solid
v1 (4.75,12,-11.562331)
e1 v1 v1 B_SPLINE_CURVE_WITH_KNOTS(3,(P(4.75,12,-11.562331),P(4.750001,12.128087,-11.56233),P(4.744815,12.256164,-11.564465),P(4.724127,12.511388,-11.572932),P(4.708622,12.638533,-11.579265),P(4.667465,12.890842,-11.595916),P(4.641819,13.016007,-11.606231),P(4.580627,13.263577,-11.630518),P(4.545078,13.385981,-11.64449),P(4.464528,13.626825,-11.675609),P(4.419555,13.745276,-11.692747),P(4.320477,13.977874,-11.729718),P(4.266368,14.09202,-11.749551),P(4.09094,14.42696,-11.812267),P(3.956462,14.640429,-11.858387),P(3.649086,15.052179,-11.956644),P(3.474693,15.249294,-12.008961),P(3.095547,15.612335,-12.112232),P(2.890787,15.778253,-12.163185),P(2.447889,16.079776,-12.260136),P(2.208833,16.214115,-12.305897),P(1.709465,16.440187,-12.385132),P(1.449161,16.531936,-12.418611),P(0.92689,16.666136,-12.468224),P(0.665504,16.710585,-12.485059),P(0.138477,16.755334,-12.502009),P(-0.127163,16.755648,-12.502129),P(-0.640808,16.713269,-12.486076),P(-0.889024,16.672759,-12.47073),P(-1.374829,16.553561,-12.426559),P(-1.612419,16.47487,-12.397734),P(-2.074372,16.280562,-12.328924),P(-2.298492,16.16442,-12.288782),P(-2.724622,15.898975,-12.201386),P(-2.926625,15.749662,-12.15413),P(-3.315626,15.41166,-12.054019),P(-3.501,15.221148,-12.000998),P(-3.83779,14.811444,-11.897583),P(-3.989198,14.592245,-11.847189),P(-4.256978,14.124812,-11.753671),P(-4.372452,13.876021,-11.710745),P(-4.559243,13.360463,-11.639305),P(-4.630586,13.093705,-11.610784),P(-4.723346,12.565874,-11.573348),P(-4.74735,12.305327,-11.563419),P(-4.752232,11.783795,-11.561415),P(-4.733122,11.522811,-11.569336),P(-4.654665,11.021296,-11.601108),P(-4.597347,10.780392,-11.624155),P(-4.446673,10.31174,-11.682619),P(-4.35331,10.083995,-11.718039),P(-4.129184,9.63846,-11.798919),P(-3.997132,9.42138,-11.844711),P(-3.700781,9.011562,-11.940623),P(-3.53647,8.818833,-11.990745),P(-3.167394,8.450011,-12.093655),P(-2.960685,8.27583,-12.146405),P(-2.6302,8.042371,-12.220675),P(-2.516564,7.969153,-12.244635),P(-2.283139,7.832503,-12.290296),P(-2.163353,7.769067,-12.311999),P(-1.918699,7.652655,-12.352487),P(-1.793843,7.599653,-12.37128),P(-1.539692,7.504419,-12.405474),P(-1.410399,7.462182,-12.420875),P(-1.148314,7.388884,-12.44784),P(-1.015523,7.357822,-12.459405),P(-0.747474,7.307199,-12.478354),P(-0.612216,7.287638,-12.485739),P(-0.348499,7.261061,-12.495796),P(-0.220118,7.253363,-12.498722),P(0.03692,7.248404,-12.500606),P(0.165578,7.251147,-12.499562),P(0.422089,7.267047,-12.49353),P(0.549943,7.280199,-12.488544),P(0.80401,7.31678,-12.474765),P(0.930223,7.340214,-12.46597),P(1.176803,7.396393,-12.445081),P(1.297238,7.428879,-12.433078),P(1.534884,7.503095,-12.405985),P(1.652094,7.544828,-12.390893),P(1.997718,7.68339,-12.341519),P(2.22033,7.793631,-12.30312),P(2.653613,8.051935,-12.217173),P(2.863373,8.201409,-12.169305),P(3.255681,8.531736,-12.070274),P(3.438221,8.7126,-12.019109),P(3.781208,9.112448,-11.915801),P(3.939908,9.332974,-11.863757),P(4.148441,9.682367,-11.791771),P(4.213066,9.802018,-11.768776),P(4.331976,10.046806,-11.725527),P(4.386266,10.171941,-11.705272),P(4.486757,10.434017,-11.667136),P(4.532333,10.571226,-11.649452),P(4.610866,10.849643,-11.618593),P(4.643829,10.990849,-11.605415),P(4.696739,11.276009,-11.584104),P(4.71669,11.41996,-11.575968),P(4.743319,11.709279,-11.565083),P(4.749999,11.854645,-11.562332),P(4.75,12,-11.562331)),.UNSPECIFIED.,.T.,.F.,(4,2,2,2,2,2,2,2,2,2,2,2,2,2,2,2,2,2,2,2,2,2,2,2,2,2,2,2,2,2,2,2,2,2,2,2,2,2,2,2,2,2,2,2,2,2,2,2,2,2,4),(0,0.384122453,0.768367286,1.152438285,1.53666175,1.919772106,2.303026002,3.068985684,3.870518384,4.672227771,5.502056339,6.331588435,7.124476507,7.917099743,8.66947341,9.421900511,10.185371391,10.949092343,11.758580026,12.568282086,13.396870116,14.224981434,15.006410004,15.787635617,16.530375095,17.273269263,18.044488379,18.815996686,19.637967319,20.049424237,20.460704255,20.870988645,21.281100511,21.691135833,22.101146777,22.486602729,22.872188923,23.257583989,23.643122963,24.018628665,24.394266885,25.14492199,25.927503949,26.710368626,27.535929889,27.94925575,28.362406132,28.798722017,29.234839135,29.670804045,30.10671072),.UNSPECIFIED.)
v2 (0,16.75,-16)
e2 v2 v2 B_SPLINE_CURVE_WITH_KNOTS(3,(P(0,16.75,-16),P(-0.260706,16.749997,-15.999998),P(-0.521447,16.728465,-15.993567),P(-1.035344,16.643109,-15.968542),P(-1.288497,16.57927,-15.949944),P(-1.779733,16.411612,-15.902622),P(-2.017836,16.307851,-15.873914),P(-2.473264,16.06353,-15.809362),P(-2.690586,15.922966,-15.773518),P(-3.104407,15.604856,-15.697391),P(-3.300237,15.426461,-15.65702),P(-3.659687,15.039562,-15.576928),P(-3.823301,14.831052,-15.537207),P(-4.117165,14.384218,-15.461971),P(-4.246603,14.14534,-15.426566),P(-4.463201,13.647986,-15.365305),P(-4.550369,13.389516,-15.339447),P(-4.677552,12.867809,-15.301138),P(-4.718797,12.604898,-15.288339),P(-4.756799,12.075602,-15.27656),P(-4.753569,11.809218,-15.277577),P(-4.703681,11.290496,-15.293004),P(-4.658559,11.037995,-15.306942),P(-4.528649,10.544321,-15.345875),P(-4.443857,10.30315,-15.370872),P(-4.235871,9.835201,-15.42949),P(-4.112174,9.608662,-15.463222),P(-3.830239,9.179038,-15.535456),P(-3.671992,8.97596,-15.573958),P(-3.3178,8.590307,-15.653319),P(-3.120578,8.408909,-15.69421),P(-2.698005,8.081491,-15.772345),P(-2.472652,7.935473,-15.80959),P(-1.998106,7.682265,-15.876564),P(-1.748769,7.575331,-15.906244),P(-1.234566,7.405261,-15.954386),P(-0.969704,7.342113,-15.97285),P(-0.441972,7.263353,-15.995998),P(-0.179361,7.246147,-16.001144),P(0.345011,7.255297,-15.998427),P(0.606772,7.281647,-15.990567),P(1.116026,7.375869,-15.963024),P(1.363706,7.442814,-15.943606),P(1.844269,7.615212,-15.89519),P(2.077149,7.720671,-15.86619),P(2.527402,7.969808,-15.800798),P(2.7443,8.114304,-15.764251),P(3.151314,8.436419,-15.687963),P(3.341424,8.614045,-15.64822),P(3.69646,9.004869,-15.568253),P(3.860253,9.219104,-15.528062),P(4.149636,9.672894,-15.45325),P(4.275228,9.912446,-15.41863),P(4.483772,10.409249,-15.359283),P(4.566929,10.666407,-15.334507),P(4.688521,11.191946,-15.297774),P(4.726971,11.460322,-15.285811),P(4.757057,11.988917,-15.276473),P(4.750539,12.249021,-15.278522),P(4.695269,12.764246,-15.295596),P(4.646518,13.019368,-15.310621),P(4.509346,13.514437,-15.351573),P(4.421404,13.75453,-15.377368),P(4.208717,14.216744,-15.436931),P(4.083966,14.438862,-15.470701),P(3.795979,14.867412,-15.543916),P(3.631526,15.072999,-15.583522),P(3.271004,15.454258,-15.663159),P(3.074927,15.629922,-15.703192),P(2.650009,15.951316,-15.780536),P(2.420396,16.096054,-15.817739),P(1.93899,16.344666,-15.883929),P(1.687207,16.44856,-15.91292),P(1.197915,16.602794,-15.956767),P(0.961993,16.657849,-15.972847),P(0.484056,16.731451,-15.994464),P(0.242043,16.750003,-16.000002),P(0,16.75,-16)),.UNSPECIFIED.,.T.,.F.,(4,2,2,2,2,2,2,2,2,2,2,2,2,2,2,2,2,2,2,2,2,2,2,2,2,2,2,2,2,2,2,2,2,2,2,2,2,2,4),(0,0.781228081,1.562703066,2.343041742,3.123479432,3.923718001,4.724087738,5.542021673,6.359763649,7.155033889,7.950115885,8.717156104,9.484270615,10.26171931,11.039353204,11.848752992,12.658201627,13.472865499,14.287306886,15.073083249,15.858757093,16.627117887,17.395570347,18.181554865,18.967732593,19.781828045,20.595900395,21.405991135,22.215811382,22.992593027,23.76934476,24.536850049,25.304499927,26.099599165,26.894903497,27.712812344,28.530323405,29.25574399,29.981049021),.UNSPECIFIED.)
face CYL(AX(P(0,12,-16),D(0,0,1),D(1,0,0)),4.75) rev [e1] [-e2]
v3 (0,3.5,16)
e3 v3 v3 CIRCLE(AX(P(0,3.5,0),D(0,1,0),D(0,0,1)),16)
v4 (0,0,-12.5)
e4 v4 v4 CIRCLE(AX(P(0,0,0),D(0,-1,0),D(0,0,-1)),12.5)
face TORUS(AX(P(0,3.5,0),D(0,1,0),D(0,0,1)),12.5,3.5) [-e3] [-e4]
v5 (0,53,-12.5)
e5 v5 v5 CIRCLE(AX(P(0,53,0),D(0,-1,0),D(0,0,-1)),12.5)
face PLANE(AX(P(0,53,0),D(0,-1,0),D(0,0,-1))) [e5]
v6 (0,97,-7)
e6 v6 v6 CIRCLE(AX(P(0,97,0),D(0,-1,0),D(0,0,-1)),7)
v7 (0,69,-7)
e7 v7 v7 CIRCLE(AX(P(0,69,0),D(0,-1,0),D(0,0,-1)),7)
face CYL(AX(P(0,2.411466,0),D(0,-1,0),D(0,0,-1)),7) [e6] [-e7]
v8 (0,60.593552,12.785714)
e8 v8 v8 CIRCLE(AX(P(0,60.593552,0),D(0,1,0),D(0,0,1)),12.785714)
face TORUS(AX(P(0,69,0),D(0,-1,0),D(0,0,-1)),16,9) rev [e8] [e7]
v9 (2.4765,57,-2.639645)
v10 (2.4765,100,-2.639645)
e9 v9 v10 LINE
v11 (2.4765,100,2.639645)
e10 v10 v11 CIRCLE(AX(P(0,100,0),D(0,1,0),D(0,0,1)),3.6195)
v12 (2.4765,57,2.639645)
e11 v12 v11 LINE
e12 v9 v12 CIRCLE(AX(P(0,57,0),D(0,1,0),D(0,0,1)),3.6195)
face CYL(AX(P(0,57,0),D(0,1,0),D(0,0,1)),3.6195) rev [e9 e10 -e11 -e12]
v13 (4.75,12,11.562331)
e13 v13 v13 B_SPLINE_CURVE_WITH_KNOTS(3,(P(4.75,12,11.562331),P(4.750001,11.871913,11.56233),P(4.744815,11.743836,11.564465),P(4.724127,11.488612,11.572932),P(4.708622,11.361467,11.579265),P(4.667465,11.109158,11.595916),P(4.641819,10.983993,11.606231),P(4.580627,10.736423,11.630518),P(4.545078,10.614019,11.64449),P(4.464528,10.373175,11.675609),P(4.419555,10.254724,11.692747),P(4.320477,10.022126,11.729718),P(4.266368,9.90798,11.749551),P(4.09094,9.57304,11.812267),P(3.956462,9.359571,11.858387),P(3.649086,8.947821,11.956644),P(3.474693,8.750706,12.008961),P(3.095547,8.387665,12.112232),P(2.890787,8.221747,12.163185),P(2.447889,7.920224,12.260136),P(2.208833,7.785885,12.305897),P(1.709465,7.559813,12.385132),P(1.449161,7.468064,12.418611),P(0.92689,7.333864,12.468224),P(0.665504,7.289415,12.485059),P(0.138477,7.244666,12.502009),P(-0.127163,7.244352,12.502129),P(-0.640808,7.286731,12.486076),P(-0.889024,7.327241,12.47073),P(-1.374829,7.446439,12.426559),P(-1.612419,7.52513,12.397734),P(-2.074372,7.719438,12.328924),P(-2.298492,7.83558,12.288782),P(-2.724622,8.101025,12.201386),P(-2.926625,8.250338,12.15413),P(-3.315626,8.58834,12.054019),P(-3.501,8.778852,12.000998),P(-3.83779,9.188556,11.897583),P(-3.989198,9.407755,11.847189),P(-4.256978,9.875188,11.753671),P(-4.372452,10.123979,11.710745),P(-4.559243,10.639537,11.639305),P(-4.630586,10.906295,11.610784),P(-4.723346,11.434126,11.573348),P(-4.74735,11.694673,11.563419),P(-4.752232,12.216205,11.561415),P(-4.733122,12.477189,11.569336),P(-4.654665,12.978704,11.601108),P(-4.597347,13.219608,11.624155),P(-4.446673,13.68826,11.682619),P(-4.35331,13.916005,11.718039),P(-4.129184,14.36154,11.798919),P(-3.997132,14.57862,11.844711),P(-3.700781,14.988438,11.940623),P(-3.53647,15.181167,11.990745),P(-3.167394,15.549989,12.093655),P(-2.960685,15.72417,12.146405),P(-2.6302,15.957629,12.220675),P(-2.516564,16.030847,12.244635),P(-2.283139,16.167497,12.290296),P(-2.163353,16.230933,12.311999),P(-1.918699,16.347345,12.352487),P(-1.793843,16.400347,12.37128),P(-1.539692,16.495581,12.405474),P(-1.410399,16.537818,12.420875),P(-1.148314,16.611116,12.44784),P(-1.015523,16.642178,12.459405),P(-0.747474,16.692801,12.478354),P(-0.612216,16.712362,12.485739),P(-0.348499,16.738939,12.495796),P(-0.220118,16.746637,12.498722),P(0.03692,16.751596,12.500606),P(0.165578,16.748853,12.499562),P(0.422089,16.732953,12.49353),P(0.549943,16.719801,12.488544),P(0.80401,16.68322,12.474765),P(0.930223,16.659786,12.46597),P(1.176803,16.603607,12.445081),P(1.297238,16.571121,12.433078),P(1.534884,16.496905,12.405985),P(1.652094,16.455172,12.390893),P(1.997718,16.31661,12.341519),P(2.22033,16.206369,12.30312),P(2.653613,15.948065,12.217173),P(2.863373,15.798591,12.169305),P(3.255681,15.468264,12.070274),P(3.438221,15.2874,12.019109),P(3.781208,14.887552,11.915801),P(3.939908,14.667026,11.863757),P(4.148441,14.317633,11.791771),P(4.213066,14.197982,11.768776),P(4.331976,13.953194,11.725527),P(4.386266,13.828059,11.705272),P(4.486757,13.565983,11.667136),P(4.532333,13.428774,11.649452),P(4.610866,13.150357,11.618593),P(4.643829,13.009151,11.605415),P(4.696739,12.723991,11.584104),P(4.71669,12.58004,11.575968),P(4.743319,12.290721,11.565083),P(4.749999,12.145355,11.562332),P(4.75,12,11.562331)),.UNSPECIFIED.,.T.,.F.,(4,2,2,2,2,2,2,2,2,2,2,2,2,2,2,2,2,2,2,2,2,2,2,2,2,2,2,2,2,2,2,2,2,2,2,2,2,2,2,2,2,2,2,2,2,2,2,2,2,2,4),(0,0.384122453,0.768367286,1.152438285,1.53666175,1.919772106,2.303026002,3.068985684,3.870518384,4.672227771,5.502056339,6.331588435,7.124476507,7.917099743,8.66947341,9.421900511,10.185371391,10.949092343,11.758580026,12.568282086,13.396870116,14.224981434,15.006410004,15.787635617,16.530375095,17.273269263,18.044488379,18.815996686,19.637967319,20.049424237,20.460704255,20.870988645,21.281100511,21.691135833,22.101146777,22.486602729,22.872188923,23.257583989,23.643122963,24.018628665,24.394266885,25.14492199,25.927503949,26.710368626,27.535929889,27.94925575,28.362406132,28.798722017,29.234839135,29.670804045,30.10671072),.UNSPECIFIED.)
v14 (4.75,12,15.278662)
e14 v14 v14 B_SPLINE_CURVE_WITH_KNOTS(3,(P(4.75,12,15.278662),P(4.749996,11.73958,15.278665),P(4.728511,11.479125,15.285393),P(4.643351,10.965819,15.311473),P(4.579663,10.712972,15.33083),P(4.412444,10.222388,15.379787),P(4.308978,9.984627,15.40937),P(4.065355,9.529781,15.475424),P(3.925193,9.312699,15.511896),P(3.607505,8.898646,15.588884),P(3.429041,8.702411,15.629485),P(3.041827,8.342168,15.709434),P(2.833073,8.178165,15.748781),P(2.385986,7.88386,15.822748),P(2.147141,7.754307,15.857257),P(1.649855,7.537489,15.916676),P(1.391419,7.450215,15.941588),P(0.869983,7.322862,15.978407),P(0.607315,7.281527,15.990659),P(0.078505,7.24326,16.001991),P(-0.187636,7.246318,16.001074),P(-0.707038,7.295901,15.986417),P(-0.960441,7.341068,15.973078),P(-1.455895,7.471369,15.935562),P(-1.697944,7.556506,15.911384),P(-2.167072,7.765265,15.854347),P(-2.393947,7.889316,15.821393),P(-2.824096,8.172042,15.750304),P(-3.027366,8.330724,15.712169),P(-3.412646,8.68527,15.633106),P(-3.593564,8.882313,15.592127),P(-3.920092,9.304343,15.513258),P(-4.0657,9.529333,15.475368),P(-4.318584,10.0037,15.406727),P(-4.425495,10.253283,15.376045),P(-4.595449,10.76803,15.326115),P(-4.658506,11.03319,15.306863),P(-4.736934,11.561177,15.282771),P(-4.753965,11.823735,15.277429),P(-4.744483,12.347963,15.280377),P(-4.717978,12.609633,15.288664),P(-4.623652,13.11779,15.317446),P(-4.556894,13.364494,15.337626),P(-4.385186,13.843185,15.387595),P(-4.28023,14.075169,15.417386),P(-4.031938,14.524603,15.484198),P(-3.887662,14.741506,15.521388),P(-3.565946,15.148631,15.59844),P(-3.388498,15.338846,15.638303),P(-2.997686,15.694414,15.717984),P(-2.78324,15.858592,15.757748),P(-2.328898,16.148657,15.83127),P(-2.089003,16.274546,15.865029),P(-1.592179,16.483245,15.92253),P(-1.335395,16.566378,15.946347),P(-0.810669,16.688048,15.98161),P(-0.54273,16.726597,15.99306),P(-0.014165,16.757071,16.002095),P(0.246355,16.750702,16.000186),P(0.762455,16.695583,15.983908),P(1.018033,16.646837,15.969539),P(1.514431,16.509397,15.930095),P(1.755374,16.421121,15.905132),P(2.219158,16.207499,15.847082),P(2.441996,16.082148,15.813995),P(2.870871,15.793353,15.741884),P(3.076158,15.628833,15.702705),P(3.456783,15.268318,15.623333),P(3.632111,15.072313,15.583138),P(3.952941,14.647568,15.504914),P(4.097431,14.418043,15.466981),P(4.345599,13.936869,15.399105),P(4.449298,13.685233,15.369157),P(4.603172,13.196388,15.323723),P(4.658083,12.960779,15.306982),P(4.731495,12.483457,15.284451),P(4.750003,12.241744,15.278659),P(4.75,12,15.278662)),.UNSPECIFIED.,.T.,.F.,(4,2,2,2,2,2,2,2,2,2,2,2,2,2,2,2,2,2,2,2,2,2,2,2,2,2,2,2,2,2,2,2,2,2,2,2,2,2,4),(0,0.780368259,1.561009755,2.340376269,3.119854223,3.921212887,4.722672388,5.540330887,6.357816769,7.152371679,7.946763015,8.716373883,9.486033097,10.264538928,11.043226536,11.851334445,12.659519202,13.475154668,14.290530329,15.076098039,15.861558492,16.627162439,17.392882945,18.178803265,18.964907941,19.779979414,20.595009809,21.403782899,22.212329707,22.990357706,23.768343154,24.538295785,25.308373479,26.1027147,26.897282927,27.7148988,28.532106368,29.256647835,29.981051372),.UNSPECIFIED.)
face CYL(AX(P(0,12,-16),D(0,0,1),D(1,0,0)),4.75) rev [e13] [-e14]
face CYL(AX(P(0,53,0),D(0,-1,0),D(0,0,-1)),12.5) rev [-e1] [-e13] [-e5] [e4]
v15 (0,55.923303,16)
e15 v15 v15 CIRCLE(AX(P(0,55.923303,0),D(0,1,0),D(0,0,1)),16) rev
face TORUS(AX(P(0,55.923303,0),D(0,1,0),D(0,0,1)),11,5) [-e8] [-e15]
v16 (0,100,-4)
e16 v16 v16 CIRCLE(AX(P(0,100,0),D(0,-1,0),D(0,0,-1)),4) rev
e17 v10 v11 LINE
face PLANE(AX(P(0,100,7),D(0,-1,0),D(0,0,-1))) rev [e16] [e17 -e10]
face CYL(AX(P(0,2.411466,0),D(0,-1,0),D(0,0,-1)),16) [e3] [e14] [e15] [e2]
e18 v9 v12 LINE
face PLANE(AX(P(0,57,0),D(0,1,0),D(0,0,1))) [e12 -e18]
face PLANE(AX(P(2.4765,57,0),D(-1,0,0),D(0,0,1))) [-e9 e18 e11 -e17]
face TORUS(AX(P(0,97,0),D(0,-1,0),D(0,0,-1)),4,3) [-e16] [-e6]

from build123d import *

# Parameters (mm, degrees)
CUT_EXTRUDE1_DEPTH      = 103.528044944
CUT_EXTRUDE1_DEPTH_BACK = 103.528044944
SKETCH2_R               = 4.75
SKETCH3_R               = 12.5
CUT_EXTRUDE2_DEPTH      = 53
CUT_EXTRUDE3_DEPTH      = 43
FILLET1_R               = 5
FILLET2_R               = 3
FILLET3_R               = 3.5


with BuildPart() as part:
    # Sketch1 → Revolve1 (revolve)
    with BuildSketch(Plane(origin=(0, 0, 0), x_dir=(0, 0, -1), z_dir=(1, 0, 0)), mode=Mode.PRIVATE) as revolve1_sk:
        with BuildLine():
            Line((0, 0), (-16, 0))
            Line((-16, 0), (-16, 60))
            ThreePointArc((-16, 60), (-9.636038969, 62.636038969), (-7, 69))
            Line((-7, 69), (-7, 80))
            Line((-7, 80), (-7, 100))
            Line((-7, 100), (0, 100))
            Line((0, 100), (0, 0))
        make_face()
    revolve(revolve1_sk.sketch.rotate(Axis((0, 2.411465541, 0), (0, 1, 0)), 180), axis=Axis((0, 2.411465541, 0), (0, 1, 0)))

    # Sketch2 → Cut-Extrude1 (cut, two sides: drawn at the far end of the back side and taken through both)
    with BuildSketch(Plane.XY.offset(-CUT_EXTRUDE1_DEPTH_BACK)):
        with Locations((0, 12)):
            Circle(SKETCH2_R)
    extrude(amount=CUT_EXTRUDE1_DEPTH + CUT_EXTRUDE1_DEPTH_BACK, mode=Mode.SUBTRACT)

    # Sketch3 → Cut-Extrude2 (cut)
    with BuildSketch(Plane.XZ):
        with Locations(Location((0, 0, 0), (0, 0, 270))):
            Circle(SKETCH3_R)
    extrude(amount=-CUT_EXTRUDE2_DEPTH, mode=Mode.SUBTRACT)

    # Sketch4 → Cut-Extrude3 (cut)
    with BuildSketch(Plane(origin=(0, 100, 0), x_dir=(1, 0, 0), z_dir=(0, 1, 0))):
        with BuildLine():
            Line((2.4765, -2.639645431), (2.4765, 2.639645431))
            ThreePointArc((2.4765, 2.639645431), (-3.6195, 0), (2.4765, -2.639645431))
        make_face()
    extrude(amount=-CUT_EXTRUDE3_DEPTH, mode=Mode.SUBTRACT)

    # Fillet1
    fillet1_edges = [part.edges().sort_by_distance(p)[0] for p in [
        (0, 60, 16),
    ]]
    fillet(fillet1_edges, radius=FILLET1_R)

    # Fillet2
    fillet2_edges = [part.edges().sort_by_distance(p)[0] for p in [
        (0, 100, 7),
    ]]
    fillet(fillet2_edges, radius=FILLET2_R)

    # Fillet3
    fillet3_edges = [part.edges().sort_by_distance(p)[0] for p in [
        (0, 0, 16),
    ]]
    fillet(fillet3_edges, radius=FILLET3_R - 0.0001)  # a hair under: the kernel refuses the full size


solid = part.part
